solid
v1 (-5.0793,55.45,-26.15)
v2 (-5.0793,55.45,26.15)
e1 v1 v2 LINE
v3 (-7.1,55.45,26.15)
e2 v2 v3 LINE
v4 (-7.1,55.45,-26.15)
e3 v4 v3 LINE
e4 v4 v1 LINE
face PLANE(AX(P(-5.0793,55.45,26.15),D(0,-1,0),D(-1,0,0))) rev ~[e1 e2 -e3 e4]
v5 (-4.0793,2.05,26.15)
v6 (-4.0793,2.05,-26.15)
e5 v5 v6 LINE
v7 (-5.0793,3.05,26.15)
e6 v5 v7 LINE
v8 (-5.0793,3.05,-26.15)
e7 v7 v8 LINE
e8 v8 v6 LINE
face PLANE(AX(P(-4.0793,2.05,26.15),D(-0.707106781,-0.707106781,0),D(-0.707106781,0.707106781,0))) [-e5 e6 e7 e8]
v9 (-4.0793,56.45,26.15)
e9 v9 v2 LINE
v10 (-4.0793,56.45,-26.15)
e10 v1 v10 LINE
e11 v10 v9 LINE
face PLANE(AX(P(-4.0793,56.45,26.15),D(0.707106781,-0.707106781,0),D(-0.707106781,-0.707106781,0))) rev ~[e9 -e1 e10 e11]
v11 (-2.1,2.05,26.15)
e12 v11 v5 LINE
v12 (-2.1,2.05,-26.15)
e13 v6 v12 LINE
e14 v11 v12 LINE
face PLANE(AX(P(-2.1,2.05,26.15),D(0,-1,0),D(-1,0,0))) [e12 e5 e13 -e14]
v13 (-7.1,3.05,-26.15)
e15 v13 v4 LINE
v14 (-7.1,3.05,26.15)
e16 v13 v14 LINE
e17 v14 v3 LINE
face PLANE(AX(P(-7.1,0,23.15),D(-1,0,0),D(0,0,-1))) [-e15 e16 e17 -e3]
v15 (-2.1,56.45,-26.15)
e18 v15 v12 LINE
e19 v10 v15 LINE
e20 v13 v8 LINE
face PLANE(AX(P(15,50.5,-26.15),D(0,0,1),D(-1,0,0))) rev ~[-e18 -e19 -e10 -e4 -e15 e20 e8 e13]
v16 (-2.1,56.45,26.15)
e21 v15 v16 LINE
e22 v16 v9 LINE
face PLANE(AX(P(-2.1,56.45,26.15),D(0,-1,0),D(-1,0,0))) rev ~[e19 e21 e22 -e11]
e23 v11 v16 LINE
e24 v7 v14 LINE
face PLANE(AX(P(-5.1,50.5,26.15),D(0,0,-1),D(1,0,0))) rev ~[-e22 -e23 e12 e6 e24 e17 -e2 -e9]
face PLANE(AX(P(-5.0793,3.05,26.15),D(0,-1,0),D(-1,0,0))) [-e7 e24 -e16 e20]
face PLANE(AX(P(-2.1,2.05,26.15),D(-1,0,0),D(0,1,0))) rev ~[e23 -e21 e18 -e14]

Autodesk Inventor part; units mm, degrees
ref_plane "YZ Plane" through (0, 0, 0) normal (1, 0, 0) x (0, 1, 0)
ref_plane "XZ Plane" through (0, 0, 0) normal (0, 1, 0) x (-1, 0, 0)
ref_plane "XY Plane" through (0, 0, 0) normal (0, 0, 1) x (1, 0, 0)
sketch "Sketch1" plane through (0, 0, 0) normal (0, 1, 0) x (-1, 0, 0)
  line L0 (-20, -25) -> (20, -25) construction
  line L1 (20, -25) -> (20, 25) construction
  line L2 (20, 25) -> (-20, 25) construction
  line L3 (-20, 25) -> (-20, -25) construction
  line L4 (-20, -25) -> (20, 25) construction
  line L5 (20, -25) -> (-20, 25) construction
  line L6 (25, 30) -> (25, -30)
  line L7 (25, -30) -> (-25, -30)
  line L8 (-25, -30) -> (-25, 30)
  line L9 (-25, 30) -> (25, 30)
  point P0 (0, 0)
  dimension "d0" = 50
  dimension "d1" = 40
  dimension "d2" = 5
sketch "Sketch2" plane through (0, 0, 0) normal (0, 1, 0) x (-1, 0, 0)
  line L0 (-20, -25) -> (20, -25) construction
  line L1 (20, -25) -> (20, 25) construction
  line L2 (20, 25) -> (-20, 25) construction
  line L3 (-20, 25) -> (-20, -25) construction
  line L4 (-20, -25) -> (20, 25) construction
  line L5 (20, -25) -> (-20, 25) construction
  line L6 (25, 30) -> (25, -30) projected
  line L7 (25, -30) -> (-25, -30) projected
  line L8 (-25, -30) -> (-25, 30) projected
  line L9 (-25, 30) -> (25, 30) projected
  point P0 (0, 0)
  point P1 (0, 0)
extrude "Extrusion1" add sketch "Sketch1" against normal blind 3
hole "Hole1" at (20, 0, -25) at (-20, 0, 25) at (-20, 0, -25) at (20, 0, 25) direction (0, -1, 0) diameter 3.4 end through all clearance for "Socket Head Cap Screw ISO 4762" size "M3" standard "ISO"
fillet "Fillet1" radius 2 4 edges at (25, -1.5, 30) (-25, -1.5, 30) (25, -1.5, -30) (-25, -1.5, -30)
sketch "Sketch3" plane through (0, 0, 0) normal (0, 1, 0) x (1, 0, 0)
  circle A0 centre (4.95, 16.1) radius 7.05
  line L0 (4.95, 37.6221) -> (4.95, -37.6221) construction
  circle A1 centre (4.95, 0) radius 7.05
  circle A2 centre (4.95, -16.1) radius 7.05
  line L1 (15, -26.15) -> (-5.1, -26.15)
  line L2 (-5.1, -26.15) -> (-5.1, 26.15)
  line L3 (-5.1, 26.15) -> (15, 26.15)
  line L4 (15, 26.15) -> (15, -26.15)
  line L5 (15, -26.15) -> (-5.1, 26.15) construction
  line L6 (-5.1, -26.15) -> (15, 26.15) construction
  line L7 (35, 0) -> (-35, 0) projected
  line L8 (25, -28) -> (25, 28) projected
  line L9 (4.95, 23.15) -> (-5.1, 23.15)
  line L10 (4.95, 9.05) -> (-5.1, 9.05)
  line L11 (4.95, 7.05) -> (-5.1, 7.05)
  line L12 (4.95, -7.05) -> (-5.3479, -7.05)
  line L13 (4.95, -9.05) -> (-5.1, -9.05)
  line L14 (4.95, -23.15) -> (-5.1, -23.15)
  point P0 (4.95, 26.15)
  point P1 (-5.1, -7.05)
  dimension "d15" = 14.1
  dimension "d16" = 14.1
  dimension "d17" = 14.1
  dimension "d18" = 16.1
  dimension "d19" = 16.1
  dimension "d20" = 10.05
  dimension "d21" = 10.05
  dimension "d60" = 10
extrude "Extrusion2" add sketch "Sketch3" along normal blind 50.5 contours A0 L9 L2 L3 L4 L7 A1 L11 L10 | L4 L1 L2 L14 A2 L13 L12 A1 L7
sketch "Sketch4" plane through (0, -3, 0) normal (0, -1, 0) x (1, 0, 0)
  line L0 (15, -26.15) -> (-5.1, -26.15) projected
  line L1 (-5.1, -26.15) -> (-5.1, -23.15) projected
  line L2 (-5.1, 26.15) -> (15, 26.15) projected
  line L3 (15, 26.15) -> (15, -26.15) projected
  arc A0 (4.95, 9.05) -> (4.95, 23.15) centre (4.95, 16.1) ccw projected
  arc A1 (4.95, -7.05) -> (4.95, 7.05) centre (4.95, 0) ccw projected
  arc A2 (4.95, -23.15) -> (4.95, -9.05) centre (4.95, -16.1) ccw projected
  circle A3 centre (4.95, -16.1) radius 1
  circle A4 centre (4.95, 16.1) radius 1
  line L4 (-5.1, -23.15) -> (4.95, -23.15) projected
  line L5 (4.95, -9.05) -> (-5.1, -9.05) projected
  line L6 (-5.1, -9.05) -> (-5.1, -7.05) projected
  line L7 (-5.1, -7.05) -> (4.95, -7.05) projected
  line L8 (4.95, 7.05) -> (-5.1, 7.05) projected
  line L9 (-5.1, 7.05) -> (-5.1, 9.05) projected
  line L10 (-5.1, 9.05) -> (4.95, 9.05) projected
  line L11 (4.95, 23.15) -> (-5.1, 23.15) projected
  line L12 (-5.1, 23.15) -> (-5.1, 26.15) projected
  point P0 (0, 0)
  dimension "d24" = 2
  dimension "d25" = 2
sketch "Sketch5" plane through (4.95, 0, -16.1) normal (0, 1, 0) x (0, 0, -1)
  line L0 (10.05, -10.05) -> (10.05, 10.05) projected
  line L1 (10.05, 10.05) -> (7.05, 10.05) projected
  line L2 (-42.25, 10.05) -> (-42.25, -10.05) projected
  line L3 (-42.25, -10.05) -> (10.05, -10.05) projected
  arc A0 (-39.25, 0) -> (-25.15, 0) centre (-32.2, 0) ccw projected
  arc A1 (-23.15, 0) -> (-9.05, 0) centre (-16.1, 0) ccw projected
  arc A2 (-7.05, 0) -> (7.05, 0) centre (0, 0) ccw projected
  circle A3 centre (0, 0) radius 2.5
  line L4 (7.05, 10.05) -> (7.05, 0) projected
  line L5 (-7.05, 0) -> (-7.05, 10.05) projected
  line L6 (-7.05, 10.05) -> (-9.05, 10.05) projected
  line L7 (-9.05, 10.05) -> (-9.05, 0) projected
  line L8 (-23.15, 0) -> (-23.15, 10.05) projected
  line L9 (-23.15, 10.05) -> (-25.15, 10.05) projected
  line L10 (-25.15, 10.05) -> (-25.15, 0) projected
  line L11 (-39.25, 0) -> (-39.25, 10.05) projected
  line L12 (-39.25, 10.05) -> (-42.25, 10.05) projected
  point P0 (-16.1, 4.95)
  dimension "d26" = 5
extrude "Extrusion3" cut sketch "Sketch5" against normal blind 1 contours A3
extrude "Extrusion4" cut sketch "Sketch4" against normal blind 2 contours A3
sketch "Sketch7" plane through (0, 50.5, 0) normal (0, 1, 0) x (1, 0, 0)
  line L0 (15, 26.15) -> (-5.1, 26.15) projected
  line L1 (-5.1, 26.15) -> (-5.1, 23.15) projected
  line L2 (-5.1, -26.15) -> (15, -26.15) projected
  line L3 (15, -26.15) -> (15, 26.15) projected
  arc A0 (4.95, -23.15) -> (4.95, -9.05) centre (4.95, -16.1) ccw construction
  arc A1 (4.95, -7.05) -> (4.95, 7.05) centre (4.95, 0) ccw construction
  arc A2 (4.95, 9.05) -> (4.95, 23.15) centre (4.95, 16.1) ccw construction
  line L4 (-5.1, 23.15) -> (4.95, 23.15) projected
  line L5 (4.95, 9.05) -> (-5.1, 9.05) projected
  line L6 (-5.1, 9.05) -> (-5.1, 7.05) projected
  line L7 (-5.1, 7.05) -> (4.95, 7.05) projected
  line L8 (4.95, -7.05) -> (-5.1, -7.05) projected
  line L9 (-5.1, -7.05) -> (-5.1, -9.05) projected
  line L10 (-5.1, -9.05) -> (4.95, -9.05) projected
  line L11 (4.95, -23.15) -> (-5.1, -23.15) projected
  line L12 (-5.1, -23.15) -> (-5.1, -26.15) projected
  line L13 (-5.1, 26.15) -> (15, 26.15)
  line L14 (15, 26.15) -> (15, -26.15)
  line L15 (15, -26.15) -> (-5.1, -26.15)
  line L16 (-5.1, -26.15) -> (-5.1, 26.15)
  point P0 (0, 0)
  point P1 (-5.1, -23.15)
extrude "Extrusion5" add sketch "Sketch7" along normal blind 8
sketch "Sketch14" plane through (0, 50.5, 0) normal (0, -1, 0) x (1, 0, 0)
  line L0 (-5.1, -23.15) -> (4.95, -23.15) projected
  arc A0 (4.95, -23.15) -> (4.95, -9.05) centre (4.95, -16.1) ccw projected
  line L1 (4.95, -9.05) -> (-5.1, -9.05) projected
  line L2 (-5.1, -23.15) -> (-5.1, -9.05) projected
  line L3 (4.95, 7.05) -> (-5.1, 7.05) projected
  line L4 (-5.1, -7.05) -> (-5.1, 7.05) projected
  line L5 (-5.1, -7.05) -> (4.95, -7.05) projected
  arc A1 (4.95, -7.05) -> (4.95, 7.05) centre (4.95, 0) ccw projected
  line L6 (4.95, 23.15) -> (-5.1, 23.15) projected
  line L7 (-5.1, 9.05) -> (-5.1, 23.15) projected
  line L8 (-5.1, 9.05) -> (4.95, 9.05) projected
  arc A2 (4.95, 9.05) -> (4.95, 23.15) centre (4.95, 16.1) ccw projected
  circle A3 centre (4.95, -16.1) radius 2.5
  circle A4 centre (4.95, 0) radius 2.5
  circle A5 centre (4.95, 16.1) radius 2.5
  point P0 (0, 0)
  dimension "d66" = 5
  dimension "d67" = 5
  dimension "d68" = 5
extrude "Extrusion10" cut sketch "Sketch14" against normal blind 1 contours A3 | A4 | A5
sketch "Sketch15" plane through (4.95, 51.5, -16.1) normal (0, -1, 0) x (1, 0, 0)
  circle A0 centre (0, 0) radius 2.5 construction
  circle A1 centre (0, 16.1) radius 2.5 construction
  line L0 (-2.5, 0) -> (-2.5, 16.1)
  line L1 (2.5, 16.1) -> (2.5, 0)
  line L2 (0, 0) -> (0, 16.1) construction
  line L3 (2.5, 0) -> (-2.5, 0)
  line L4 (2.5, 16.1) -> (-2.5, 16.1)
  point P0 (-4.95, 16.1)
extrude "Extrusion11" cut sketch "Sketch15" against normal blind 2
chamfer "Chamfer1" distance 2 angle 45 2 edges at (4.95, 51.5, 0) (4.95, 51.5, -16.1)
sketch "Sketch16" plane through (0, 0, 0) normal (0, 1, 0) x (1, 0, 0)
  circle A0 centre (4.95, 16.1) radius 2.5 projected
  line L0 (-5.1, 26.15) -> (15, 26.15) projected
  line L1 (15, 26.15) -> (15, -26.15) projected
  line L2 (15, -26.15) -> (-5.1, -26.15) projected
  line L3 (-5.1, -26.15) -> (-5.1, -23.15) projected
  line L4 (-5.1, -23.15) -> (4.95, -23.15) projected
  arc A1 (4.95, -23.15) -> (4.95, -9.05) centre (4.95, -16.1) ccw projected
  line L5 (4.95, -9.05) -> (-5.1, -9.05) projected
  line L6 (-5.1, -9.05) -> (-5.1, -7.05) projected
  line L7 (-5.1, -7.05) -> (4.95, -7.05) projected
  arc A2 (4.95, -7.05) -> (4.95, 7.05) centre (4.95, 0) ccw projected
  line L8 (4.95, 7.05) -> (-5.1, 7.05) projected
  line L9 (-5.1, 7.05) -> (-5.1, 9.05) projected
  line L10 (-5.1, 9.05) -> (4.95, 9.05) projected
  arc A3 (4.95, 9.05) -> (4.95, 23.15) centre (4.95, 16.1) ccw projected
  line L11 (4.95, 23.15) -> (-5.1, 23.15) projected
  line L12 (-5.1, 23.15) -> (-5.1, 26.15) projected
  circle A4 centre (20, -25) radius 1.7 projected
  circle A5 centre (-20, 25) radius 1.7 projected
  circle A6 centre (-20, -25) radius 1.7 projected
  circle A7 centre (20, 25) radius 1.7 projected
  arc A8 (-23, 30) -> (-25, 28) centre (-23, 28) ccw projected
  line L13 (-25, 28) -> (-25, -28) projected
  arc A9 (-25, -28) -> (-23, -30) centre (-23, -28) ccw projected
  line L14 (-23, -30) -> (23, -30) projected
  arc A10 (23, -30) -> (25, -28) centre (23, -28) ccw projected
  line L15 (25, -28) -> (25, 28) projected
  arc A11 (25, 28) -> (23, 30) centre (23, 28) ccw projected
  line L16 (23, 30) -> (-23, 30) projected
  circle A12 centre (4.95, 0) radius 2.5
  circle A13 centre (4.95, -16.1) radius 2.5
  line L17 (5.95, -2.2913) -> (5.95, -13.8087)
  line L18 (3.95, -13.8087) -> (3.95, -2.2913)
  line L19 (4.95, 0) -> (4.95, -16.1) construction
  point P0 (0, 0)
  dimension "d76" = 5
  dimension "d77" = 5
  dimension "d78" = 2
  dimension "d79" = 1
extrude "Extrusion12" cut sketch "Sketch16" against normal blind 1 contours L17 A13 L18 L5 A1 | A1 L5 L18 L7 A2 L17 | A2 L7 L18 A12 L17 | A13 | A12
sketch "Sketch17" plane through (4.95, 51.5, 16.1) normal (0, -1, 0) x (1, 0, 0)
  circle A0 centre (0, -32.2) radius 1 projected
  arc A1 (-29.95, -44.1) -> (-27.95, -46.1) centre (-27.95, -44.1) ccw projected
  line L0 (-27.95, -46.1) -> (18.05, -46.1) projected
  arc A2 (18.05, -46.1) -> (20.05, -44.1) centre (18.05, -44.1) ccw projected
  line L1 (20.05, -44.1) -> (20.05, 11.9) projected
  arc A3 (20.05, 11.9) -> (18.05, 13.9) centre (18.05, 11.9) ccw projected
  line L2 (18.05, 13.9) -> (-27.95, 13.9) projected
  arc A4 (-27.95, 13.9) -> (-29.95, 11.9) centre (-27.95, 11.9) ccw projected
  line L3 (-29.95, 11.9) -> (-29.95, -44.1) projected
  circle A5 centre (15.05, 8.9) radius 1.7 projected
  circle A6 centre (-24.95, -41.1) radius 1.7 projected
  circle A7 centre (-24.95, 8.9) radius 1.7 projected
  circle A8 centre (15.05, -41.1) radius 1.7 projected
  circle A9 centre (0, -16.1) radius 2.5 projected
  circle A10 centre (0, 0) radius 2.5 construction
  line L4 (0, 0) -> (7.05, -7.05) construction
  line L5 (-10.05, -7.05) -> (-10.05, 7.05) projected
  circle A11 centre (7.05, -7.05) radius 1.5
  line L6 (0, -7.05) -> (-1, -7.05) projected
  line L7 (-10.05, -7.05) -> (0, -7.05) projected
  line L8 (-1, -7.05) -> (-10.05, -7.05) projected
  arc A12 (1, -6.9787) -> (0, 7.05) centre (0, 0) ccw projected
  arc A13 (0, -7.05) -> (0, 7.05) centre (0, 0) ccw projected
  arc A14 (0, -7.05) -> (1, -6.9787) centre (0, 0) ccw projected
  line L9 (1, -13.8087) -> (1, -9.1213) projected
  arc A15 (0, -23.15) -> (1, -9.1213) centre (0, -16.1) ccw projected
  line L10 (0, -23.15) -> (-10.05, -23.15) projected
  line L11 (-10.05, -23.15) -> (-10.05, -25.15) projected
  line L12 (-10.05, -25.15) -> (0, -25.15) projected
  arc A16 (0, -39.25) -> (0, -25.15) centre (0, -32.2) ccw projected
  line L13 (0, -39.25) -> (-10.05, -39.25) projected
  line L14 (-10.05, -39.25) -> (-10.05, -42.25) projected
  line L15 (-10.05, -42.25) -> (10.05, -42.25) projected
  line L16 (10.05, -42.25) -> (10.05, 10.05) projected
  line L17 (10.05, 10.05) -> (-10.05, 10.05) projected
  line L18 (-10.05, 10.05) -> (-10.05, 7.05) projected
  line L19 (-10.05, 7.05) -> (0, 7.05) projected
  arc A17 (1, -6.9787) -> (0, 7.05) centre (0, 0) ccw projected
  line L20 (1, -6.9787) -> (1, -2.2913) projected
  arc A18 (1, -2.2913) -> (-1, -2.2913) centre (0, 0) ccw projected
  line L21 (-1, -2.2913) -> (-1, -7.05) projected
  line L22 (-1, -7.05) -> (-10.05, -7.05) projected
  line L23 (-10.05, -7.05) -> (-10.05, -9.05) projected
  line L24 (-10.05, -9.05) -> (-1, -9.05) projected
  line L25 (-1, -9.05) -> (-1, -13.8087) projected
  arc A19 (-1, -13.8087) -> (1, -13.8087) centre (0, -16.1) ccw projected
  circle A20 centre (0, -32.2) radius 2.5 projected
  circle A21 centre (15.05, 8.9) radius 1.7 projected
  circle A22 centre (-24.95, -41.1) radius 1.7 projected
  circle A23 centre (-24.95, 8.9) radius 1.7 projected
  circle A24 centre (15.05, -41.1) radius 1.7 projected
  arc A25 (-29.95, -44.1) -> (-27.95, -46.1) centre (-27.95, -44.1) ccw projected
  line L26 (-29.95, -44.1) -> (-29.95, 11.9) projected
  arc A26 (-27.95, 13.9) -> (-29.95, 11.9) centre (-27.95, 11.9) ccw projected
  line L27 (-27.95, 13.9) -> (18.05, 13.9) projected
  arc A27 (20.05, 11.9) -> (18.05, 13.9) centre (18.05, 11.9) ccw projected
  line L28 (20.05, 11.9) -> (20.05, -44.1) projected
  arc A28 (18.05, -46.1) -> (20.05, -44.1) centre (18.05, -44.1) ccw projected
  line L29 (18.05, -46.1) -> (-27.95, -46.1) projected
  point P0 (-4.95, -16.1)
  dimension "d83" = 3
  dimension "d84" = 45
  dimension "d85" = 3
extrude "Extrusion13" cut sketch "Sketch17" along normal through all contours A11
sketch "Sketch18" plane through (4.95, 51.5, 16.1) normal (0, -1, 0) x (1, 0, 0)
  circle A0 centre (7.05, -7.05) radius 1.5 projected
  circle A1 centre (7.05, -7.05) radius 1.5 projected
  circle A2 centre (0, 0) radius 2.5 projected
  circle A3 centre (0, 0) radius 2.5 projected
  line L0 (7.05, -7.05) -> (0, 0) construction
  line L1 (8.1107, -5.9893) -> (2.4749, -0.3536)
  circle A4 centre (0, 0) radius 2.5 projected
  line L2 (0.3536, -2.4749) -> (5.9893, -8.1107)
  line L3 (0.3536, -2.4749) -> (2.4749, -0.3536)
  line L4 (8.1107, -5.9893) -> (5.9893, -8.1107)
  point P0 (-4.95, -16.1)
  point P1 (5.2928, -3.1714)
  point P2 (5.9893, -8.1107)
  dimension "d89" = 3
extrude "Extrusion14" cut sketch "Sketch18" against normal blind 2 contours L4 A0 | A0 L2 A2 L1 | A2 L3 picked at (6.5012, -6.2587) picked at (1.7238, -1.2336)
chamfer "Chamfer2" distance 2 angle 45 1 edges at (6.3642, 51.5, 14.6858)
chamfer "Chamfer3" distance 1.4 angle 45 1 edges at (12, 51.5, 9.05)
sketch "Sketch19" plane through (0, 0, 0) normal (0, 1, 0) x (1, 0, 0)
  line L0 (5.95, -2.2913) -> (5.95, -13.8087) projected
  arc A0 (5.95, -2.2913) -> (3.95, -2.2913) centre (4.95, 0) ccw projected
  line L1 (3.95, -13.8087) -> (3.95, -2.2913) projected
  arc A1 (3.95, -13.8087) -> (5.95, -13.8087) centre (4.95, -16.1) ccw projected
  circle A2 centre (4.95, -16.1) radius 7.05
  line L2 (-5.1, -9.05) -> (-5.1, -7.05) projected
  line L3 (-5.1, -23.15) -> (4.95, -23.15) projected
  line L4 (-5.1, -9.05) -> (-5.1, -23.15)
  point P0 (0, 0)
  dimension "d98" = 14.1
sketch "Sketch20" plane through (-5.1, 50.5, -23.15) normal (-1, 0, 0) x (0, 0, 1)
  line L0 (49.3, -50.5) -> (46.3, -50.5) projected
  line L1 (49.3, -50.5) -> (49.3, 8) projected
  line L2 (-3, 8) -> (49.3, 8) projected
  line L3 (-3, -50.5) -> (-3, 8) projected
  line L4 (0, -50.5) -> (-3, -50.5) projected
  line L5 (0, -50.5) -> (0, 0) projected
  line L6 (0, 0) -> (14.1, 0) projected
  line L7 (14.1, -50.5) -> (14.1, 0) projected
  line L8 (16.1, -50.5) -> (14.1, -50.5) projected
  line L9 (16.1, -50.5) -> (16.1, 0) projected
  line L10 (16.1, 0) -> (30.2, 0) projected
  line L11 (30.2, -50.5) -> (30.2, 0) projected
  line L12 (32.2, -50.5) -> (30.2, -50.5) projected
  line L13 (32.2, -50.5) -> (32.2, 0) projected
  line L14 (32.2, 0) -> (46.3, 0) projected
  line L15 (46.3, -50.5) -> (46.3, 0) projected
  point P0 (23.15, -50.5)
extrude "Extrusion15" add sketch "Sketch20" along normal blind 2
sketch "Sketch21" plane through (0, 0, 0) normal (0, 1, 0) x (1, 0, 0)
  line L0 (-7.1, -23.15) -> (4.95, -23.15) projected
  line L1 (-7.1, -23.15) -> (-7.1, 23.15)
  line L2 (-2.1, -23.15) -> (-2.1, 23.15)
  circle A0 centre (4.95, -16.1) radius 7.05 projected
  line L3 (4.95, 23.15) -> (-7.1, 23.15) projected
  point P0 (0, 0)
extrude "Extrusion16" add sketch "Sketch21" along normal blind 58.5 contours L1 L3 L2 L0
sketch "Sketch22" plane through (15, 0, 26.15) normal (0, 0, 1) x (1, 0, 0)
  line L0 (-22.1, 0) -> (-22.1, 58.5) projected
  line L1 (-22.1, 29.25) -> (0.0273, 29.25) construction
  line L2 (-22.1, 0) -> (-22.1, 3)
  line L3 (-22.1, 3) -> (-20.1, 3) construction
  line L4 (-20.1, 3) -> (-19.1, 2) construction
  line L5 (-19.1, 2) -> (-17.1, 2) construction
  line L6 (-17.1, 2) -> (-17.1, 0)
  line L7 (-11.05, 0) -> (-17.1, 0) projected
  line L8 (-38, 0) -> (8, 0) projected
  line L9 (-22.1, 58.5) -> (-22.1, 0)
  line L10 (-22.1, 58.5) -> (-22.1, 55.5)
  line L11 (-22.1, 55.5) -> (-20.1, 55.5) construction
  line L12 (-20.1, 55.5) -> (-19.1, 56.5) construction
  line L13 (-19.1, 56.5) -> (-17.1, 56.5) construction
  line L14 (-17.1, 56.5) -> (-17.1, 58.5)
  line L15 (-11.05, 58.5) -> (-17.1, 58.5)
  line L16 (-17.1, 2) -> (-17.1, 56.5)
  line L17 (-61.1197, 77.7276) -> (44.0103, 77.7276)
  line L18 (44.0103, 77.7276) -> (44.0103, -41.1524)
  line L19 (44.0103, -41.1524) -> (-61.1197, -41.1524)
  line L20 (-61.1197, -41.1524) -> (-61.1197, 77.7276)
  line L21 (-17.1, 56.45) -> (-19.0793, 56.45)
  line L22 (-19.0793, 56.45) -> (-20.0793, 55.45)
  line L23 (-20.0793, 55.45) -> (-22.1, 55.45)
  line L24 (-17.1, 2.05) -> (-19.0793, 2.05)
  line L25 (-19.0793, 2.05) -> (-20.0793, 3.05)
  line L26 (-20.0793, 3.05) -> (-22.1, 3.05)
  point P0 (-15, 0)
  point P1 (-15, 58.5)
  dimension "d104" = 3
  dimension "d105" = 2
  dimension "d106" = 2
  dimension "d107" = 45
  dimension "d108" = 5
  dimension "d111" = 0.05
  dimension "d112" = 0.05
  dimension "d113" = 0.05
  dimension "d114" = 0.05
  dimension "d115" = 0.05
  dimension "d116" = 0.05
extrude "Extrusion17" cut sketch "Sketch22" along normal through all both and the other way through all contours L0 L26 L25 L24 L16 L6 L8 | L17 L18 L19 L20
equation "\"d16\" = d15"
equation "\"d17\" = d15"
equation "\"d19\" = d18"
equation "\"d21\" = d20"
properties part number "battery holder lid"
